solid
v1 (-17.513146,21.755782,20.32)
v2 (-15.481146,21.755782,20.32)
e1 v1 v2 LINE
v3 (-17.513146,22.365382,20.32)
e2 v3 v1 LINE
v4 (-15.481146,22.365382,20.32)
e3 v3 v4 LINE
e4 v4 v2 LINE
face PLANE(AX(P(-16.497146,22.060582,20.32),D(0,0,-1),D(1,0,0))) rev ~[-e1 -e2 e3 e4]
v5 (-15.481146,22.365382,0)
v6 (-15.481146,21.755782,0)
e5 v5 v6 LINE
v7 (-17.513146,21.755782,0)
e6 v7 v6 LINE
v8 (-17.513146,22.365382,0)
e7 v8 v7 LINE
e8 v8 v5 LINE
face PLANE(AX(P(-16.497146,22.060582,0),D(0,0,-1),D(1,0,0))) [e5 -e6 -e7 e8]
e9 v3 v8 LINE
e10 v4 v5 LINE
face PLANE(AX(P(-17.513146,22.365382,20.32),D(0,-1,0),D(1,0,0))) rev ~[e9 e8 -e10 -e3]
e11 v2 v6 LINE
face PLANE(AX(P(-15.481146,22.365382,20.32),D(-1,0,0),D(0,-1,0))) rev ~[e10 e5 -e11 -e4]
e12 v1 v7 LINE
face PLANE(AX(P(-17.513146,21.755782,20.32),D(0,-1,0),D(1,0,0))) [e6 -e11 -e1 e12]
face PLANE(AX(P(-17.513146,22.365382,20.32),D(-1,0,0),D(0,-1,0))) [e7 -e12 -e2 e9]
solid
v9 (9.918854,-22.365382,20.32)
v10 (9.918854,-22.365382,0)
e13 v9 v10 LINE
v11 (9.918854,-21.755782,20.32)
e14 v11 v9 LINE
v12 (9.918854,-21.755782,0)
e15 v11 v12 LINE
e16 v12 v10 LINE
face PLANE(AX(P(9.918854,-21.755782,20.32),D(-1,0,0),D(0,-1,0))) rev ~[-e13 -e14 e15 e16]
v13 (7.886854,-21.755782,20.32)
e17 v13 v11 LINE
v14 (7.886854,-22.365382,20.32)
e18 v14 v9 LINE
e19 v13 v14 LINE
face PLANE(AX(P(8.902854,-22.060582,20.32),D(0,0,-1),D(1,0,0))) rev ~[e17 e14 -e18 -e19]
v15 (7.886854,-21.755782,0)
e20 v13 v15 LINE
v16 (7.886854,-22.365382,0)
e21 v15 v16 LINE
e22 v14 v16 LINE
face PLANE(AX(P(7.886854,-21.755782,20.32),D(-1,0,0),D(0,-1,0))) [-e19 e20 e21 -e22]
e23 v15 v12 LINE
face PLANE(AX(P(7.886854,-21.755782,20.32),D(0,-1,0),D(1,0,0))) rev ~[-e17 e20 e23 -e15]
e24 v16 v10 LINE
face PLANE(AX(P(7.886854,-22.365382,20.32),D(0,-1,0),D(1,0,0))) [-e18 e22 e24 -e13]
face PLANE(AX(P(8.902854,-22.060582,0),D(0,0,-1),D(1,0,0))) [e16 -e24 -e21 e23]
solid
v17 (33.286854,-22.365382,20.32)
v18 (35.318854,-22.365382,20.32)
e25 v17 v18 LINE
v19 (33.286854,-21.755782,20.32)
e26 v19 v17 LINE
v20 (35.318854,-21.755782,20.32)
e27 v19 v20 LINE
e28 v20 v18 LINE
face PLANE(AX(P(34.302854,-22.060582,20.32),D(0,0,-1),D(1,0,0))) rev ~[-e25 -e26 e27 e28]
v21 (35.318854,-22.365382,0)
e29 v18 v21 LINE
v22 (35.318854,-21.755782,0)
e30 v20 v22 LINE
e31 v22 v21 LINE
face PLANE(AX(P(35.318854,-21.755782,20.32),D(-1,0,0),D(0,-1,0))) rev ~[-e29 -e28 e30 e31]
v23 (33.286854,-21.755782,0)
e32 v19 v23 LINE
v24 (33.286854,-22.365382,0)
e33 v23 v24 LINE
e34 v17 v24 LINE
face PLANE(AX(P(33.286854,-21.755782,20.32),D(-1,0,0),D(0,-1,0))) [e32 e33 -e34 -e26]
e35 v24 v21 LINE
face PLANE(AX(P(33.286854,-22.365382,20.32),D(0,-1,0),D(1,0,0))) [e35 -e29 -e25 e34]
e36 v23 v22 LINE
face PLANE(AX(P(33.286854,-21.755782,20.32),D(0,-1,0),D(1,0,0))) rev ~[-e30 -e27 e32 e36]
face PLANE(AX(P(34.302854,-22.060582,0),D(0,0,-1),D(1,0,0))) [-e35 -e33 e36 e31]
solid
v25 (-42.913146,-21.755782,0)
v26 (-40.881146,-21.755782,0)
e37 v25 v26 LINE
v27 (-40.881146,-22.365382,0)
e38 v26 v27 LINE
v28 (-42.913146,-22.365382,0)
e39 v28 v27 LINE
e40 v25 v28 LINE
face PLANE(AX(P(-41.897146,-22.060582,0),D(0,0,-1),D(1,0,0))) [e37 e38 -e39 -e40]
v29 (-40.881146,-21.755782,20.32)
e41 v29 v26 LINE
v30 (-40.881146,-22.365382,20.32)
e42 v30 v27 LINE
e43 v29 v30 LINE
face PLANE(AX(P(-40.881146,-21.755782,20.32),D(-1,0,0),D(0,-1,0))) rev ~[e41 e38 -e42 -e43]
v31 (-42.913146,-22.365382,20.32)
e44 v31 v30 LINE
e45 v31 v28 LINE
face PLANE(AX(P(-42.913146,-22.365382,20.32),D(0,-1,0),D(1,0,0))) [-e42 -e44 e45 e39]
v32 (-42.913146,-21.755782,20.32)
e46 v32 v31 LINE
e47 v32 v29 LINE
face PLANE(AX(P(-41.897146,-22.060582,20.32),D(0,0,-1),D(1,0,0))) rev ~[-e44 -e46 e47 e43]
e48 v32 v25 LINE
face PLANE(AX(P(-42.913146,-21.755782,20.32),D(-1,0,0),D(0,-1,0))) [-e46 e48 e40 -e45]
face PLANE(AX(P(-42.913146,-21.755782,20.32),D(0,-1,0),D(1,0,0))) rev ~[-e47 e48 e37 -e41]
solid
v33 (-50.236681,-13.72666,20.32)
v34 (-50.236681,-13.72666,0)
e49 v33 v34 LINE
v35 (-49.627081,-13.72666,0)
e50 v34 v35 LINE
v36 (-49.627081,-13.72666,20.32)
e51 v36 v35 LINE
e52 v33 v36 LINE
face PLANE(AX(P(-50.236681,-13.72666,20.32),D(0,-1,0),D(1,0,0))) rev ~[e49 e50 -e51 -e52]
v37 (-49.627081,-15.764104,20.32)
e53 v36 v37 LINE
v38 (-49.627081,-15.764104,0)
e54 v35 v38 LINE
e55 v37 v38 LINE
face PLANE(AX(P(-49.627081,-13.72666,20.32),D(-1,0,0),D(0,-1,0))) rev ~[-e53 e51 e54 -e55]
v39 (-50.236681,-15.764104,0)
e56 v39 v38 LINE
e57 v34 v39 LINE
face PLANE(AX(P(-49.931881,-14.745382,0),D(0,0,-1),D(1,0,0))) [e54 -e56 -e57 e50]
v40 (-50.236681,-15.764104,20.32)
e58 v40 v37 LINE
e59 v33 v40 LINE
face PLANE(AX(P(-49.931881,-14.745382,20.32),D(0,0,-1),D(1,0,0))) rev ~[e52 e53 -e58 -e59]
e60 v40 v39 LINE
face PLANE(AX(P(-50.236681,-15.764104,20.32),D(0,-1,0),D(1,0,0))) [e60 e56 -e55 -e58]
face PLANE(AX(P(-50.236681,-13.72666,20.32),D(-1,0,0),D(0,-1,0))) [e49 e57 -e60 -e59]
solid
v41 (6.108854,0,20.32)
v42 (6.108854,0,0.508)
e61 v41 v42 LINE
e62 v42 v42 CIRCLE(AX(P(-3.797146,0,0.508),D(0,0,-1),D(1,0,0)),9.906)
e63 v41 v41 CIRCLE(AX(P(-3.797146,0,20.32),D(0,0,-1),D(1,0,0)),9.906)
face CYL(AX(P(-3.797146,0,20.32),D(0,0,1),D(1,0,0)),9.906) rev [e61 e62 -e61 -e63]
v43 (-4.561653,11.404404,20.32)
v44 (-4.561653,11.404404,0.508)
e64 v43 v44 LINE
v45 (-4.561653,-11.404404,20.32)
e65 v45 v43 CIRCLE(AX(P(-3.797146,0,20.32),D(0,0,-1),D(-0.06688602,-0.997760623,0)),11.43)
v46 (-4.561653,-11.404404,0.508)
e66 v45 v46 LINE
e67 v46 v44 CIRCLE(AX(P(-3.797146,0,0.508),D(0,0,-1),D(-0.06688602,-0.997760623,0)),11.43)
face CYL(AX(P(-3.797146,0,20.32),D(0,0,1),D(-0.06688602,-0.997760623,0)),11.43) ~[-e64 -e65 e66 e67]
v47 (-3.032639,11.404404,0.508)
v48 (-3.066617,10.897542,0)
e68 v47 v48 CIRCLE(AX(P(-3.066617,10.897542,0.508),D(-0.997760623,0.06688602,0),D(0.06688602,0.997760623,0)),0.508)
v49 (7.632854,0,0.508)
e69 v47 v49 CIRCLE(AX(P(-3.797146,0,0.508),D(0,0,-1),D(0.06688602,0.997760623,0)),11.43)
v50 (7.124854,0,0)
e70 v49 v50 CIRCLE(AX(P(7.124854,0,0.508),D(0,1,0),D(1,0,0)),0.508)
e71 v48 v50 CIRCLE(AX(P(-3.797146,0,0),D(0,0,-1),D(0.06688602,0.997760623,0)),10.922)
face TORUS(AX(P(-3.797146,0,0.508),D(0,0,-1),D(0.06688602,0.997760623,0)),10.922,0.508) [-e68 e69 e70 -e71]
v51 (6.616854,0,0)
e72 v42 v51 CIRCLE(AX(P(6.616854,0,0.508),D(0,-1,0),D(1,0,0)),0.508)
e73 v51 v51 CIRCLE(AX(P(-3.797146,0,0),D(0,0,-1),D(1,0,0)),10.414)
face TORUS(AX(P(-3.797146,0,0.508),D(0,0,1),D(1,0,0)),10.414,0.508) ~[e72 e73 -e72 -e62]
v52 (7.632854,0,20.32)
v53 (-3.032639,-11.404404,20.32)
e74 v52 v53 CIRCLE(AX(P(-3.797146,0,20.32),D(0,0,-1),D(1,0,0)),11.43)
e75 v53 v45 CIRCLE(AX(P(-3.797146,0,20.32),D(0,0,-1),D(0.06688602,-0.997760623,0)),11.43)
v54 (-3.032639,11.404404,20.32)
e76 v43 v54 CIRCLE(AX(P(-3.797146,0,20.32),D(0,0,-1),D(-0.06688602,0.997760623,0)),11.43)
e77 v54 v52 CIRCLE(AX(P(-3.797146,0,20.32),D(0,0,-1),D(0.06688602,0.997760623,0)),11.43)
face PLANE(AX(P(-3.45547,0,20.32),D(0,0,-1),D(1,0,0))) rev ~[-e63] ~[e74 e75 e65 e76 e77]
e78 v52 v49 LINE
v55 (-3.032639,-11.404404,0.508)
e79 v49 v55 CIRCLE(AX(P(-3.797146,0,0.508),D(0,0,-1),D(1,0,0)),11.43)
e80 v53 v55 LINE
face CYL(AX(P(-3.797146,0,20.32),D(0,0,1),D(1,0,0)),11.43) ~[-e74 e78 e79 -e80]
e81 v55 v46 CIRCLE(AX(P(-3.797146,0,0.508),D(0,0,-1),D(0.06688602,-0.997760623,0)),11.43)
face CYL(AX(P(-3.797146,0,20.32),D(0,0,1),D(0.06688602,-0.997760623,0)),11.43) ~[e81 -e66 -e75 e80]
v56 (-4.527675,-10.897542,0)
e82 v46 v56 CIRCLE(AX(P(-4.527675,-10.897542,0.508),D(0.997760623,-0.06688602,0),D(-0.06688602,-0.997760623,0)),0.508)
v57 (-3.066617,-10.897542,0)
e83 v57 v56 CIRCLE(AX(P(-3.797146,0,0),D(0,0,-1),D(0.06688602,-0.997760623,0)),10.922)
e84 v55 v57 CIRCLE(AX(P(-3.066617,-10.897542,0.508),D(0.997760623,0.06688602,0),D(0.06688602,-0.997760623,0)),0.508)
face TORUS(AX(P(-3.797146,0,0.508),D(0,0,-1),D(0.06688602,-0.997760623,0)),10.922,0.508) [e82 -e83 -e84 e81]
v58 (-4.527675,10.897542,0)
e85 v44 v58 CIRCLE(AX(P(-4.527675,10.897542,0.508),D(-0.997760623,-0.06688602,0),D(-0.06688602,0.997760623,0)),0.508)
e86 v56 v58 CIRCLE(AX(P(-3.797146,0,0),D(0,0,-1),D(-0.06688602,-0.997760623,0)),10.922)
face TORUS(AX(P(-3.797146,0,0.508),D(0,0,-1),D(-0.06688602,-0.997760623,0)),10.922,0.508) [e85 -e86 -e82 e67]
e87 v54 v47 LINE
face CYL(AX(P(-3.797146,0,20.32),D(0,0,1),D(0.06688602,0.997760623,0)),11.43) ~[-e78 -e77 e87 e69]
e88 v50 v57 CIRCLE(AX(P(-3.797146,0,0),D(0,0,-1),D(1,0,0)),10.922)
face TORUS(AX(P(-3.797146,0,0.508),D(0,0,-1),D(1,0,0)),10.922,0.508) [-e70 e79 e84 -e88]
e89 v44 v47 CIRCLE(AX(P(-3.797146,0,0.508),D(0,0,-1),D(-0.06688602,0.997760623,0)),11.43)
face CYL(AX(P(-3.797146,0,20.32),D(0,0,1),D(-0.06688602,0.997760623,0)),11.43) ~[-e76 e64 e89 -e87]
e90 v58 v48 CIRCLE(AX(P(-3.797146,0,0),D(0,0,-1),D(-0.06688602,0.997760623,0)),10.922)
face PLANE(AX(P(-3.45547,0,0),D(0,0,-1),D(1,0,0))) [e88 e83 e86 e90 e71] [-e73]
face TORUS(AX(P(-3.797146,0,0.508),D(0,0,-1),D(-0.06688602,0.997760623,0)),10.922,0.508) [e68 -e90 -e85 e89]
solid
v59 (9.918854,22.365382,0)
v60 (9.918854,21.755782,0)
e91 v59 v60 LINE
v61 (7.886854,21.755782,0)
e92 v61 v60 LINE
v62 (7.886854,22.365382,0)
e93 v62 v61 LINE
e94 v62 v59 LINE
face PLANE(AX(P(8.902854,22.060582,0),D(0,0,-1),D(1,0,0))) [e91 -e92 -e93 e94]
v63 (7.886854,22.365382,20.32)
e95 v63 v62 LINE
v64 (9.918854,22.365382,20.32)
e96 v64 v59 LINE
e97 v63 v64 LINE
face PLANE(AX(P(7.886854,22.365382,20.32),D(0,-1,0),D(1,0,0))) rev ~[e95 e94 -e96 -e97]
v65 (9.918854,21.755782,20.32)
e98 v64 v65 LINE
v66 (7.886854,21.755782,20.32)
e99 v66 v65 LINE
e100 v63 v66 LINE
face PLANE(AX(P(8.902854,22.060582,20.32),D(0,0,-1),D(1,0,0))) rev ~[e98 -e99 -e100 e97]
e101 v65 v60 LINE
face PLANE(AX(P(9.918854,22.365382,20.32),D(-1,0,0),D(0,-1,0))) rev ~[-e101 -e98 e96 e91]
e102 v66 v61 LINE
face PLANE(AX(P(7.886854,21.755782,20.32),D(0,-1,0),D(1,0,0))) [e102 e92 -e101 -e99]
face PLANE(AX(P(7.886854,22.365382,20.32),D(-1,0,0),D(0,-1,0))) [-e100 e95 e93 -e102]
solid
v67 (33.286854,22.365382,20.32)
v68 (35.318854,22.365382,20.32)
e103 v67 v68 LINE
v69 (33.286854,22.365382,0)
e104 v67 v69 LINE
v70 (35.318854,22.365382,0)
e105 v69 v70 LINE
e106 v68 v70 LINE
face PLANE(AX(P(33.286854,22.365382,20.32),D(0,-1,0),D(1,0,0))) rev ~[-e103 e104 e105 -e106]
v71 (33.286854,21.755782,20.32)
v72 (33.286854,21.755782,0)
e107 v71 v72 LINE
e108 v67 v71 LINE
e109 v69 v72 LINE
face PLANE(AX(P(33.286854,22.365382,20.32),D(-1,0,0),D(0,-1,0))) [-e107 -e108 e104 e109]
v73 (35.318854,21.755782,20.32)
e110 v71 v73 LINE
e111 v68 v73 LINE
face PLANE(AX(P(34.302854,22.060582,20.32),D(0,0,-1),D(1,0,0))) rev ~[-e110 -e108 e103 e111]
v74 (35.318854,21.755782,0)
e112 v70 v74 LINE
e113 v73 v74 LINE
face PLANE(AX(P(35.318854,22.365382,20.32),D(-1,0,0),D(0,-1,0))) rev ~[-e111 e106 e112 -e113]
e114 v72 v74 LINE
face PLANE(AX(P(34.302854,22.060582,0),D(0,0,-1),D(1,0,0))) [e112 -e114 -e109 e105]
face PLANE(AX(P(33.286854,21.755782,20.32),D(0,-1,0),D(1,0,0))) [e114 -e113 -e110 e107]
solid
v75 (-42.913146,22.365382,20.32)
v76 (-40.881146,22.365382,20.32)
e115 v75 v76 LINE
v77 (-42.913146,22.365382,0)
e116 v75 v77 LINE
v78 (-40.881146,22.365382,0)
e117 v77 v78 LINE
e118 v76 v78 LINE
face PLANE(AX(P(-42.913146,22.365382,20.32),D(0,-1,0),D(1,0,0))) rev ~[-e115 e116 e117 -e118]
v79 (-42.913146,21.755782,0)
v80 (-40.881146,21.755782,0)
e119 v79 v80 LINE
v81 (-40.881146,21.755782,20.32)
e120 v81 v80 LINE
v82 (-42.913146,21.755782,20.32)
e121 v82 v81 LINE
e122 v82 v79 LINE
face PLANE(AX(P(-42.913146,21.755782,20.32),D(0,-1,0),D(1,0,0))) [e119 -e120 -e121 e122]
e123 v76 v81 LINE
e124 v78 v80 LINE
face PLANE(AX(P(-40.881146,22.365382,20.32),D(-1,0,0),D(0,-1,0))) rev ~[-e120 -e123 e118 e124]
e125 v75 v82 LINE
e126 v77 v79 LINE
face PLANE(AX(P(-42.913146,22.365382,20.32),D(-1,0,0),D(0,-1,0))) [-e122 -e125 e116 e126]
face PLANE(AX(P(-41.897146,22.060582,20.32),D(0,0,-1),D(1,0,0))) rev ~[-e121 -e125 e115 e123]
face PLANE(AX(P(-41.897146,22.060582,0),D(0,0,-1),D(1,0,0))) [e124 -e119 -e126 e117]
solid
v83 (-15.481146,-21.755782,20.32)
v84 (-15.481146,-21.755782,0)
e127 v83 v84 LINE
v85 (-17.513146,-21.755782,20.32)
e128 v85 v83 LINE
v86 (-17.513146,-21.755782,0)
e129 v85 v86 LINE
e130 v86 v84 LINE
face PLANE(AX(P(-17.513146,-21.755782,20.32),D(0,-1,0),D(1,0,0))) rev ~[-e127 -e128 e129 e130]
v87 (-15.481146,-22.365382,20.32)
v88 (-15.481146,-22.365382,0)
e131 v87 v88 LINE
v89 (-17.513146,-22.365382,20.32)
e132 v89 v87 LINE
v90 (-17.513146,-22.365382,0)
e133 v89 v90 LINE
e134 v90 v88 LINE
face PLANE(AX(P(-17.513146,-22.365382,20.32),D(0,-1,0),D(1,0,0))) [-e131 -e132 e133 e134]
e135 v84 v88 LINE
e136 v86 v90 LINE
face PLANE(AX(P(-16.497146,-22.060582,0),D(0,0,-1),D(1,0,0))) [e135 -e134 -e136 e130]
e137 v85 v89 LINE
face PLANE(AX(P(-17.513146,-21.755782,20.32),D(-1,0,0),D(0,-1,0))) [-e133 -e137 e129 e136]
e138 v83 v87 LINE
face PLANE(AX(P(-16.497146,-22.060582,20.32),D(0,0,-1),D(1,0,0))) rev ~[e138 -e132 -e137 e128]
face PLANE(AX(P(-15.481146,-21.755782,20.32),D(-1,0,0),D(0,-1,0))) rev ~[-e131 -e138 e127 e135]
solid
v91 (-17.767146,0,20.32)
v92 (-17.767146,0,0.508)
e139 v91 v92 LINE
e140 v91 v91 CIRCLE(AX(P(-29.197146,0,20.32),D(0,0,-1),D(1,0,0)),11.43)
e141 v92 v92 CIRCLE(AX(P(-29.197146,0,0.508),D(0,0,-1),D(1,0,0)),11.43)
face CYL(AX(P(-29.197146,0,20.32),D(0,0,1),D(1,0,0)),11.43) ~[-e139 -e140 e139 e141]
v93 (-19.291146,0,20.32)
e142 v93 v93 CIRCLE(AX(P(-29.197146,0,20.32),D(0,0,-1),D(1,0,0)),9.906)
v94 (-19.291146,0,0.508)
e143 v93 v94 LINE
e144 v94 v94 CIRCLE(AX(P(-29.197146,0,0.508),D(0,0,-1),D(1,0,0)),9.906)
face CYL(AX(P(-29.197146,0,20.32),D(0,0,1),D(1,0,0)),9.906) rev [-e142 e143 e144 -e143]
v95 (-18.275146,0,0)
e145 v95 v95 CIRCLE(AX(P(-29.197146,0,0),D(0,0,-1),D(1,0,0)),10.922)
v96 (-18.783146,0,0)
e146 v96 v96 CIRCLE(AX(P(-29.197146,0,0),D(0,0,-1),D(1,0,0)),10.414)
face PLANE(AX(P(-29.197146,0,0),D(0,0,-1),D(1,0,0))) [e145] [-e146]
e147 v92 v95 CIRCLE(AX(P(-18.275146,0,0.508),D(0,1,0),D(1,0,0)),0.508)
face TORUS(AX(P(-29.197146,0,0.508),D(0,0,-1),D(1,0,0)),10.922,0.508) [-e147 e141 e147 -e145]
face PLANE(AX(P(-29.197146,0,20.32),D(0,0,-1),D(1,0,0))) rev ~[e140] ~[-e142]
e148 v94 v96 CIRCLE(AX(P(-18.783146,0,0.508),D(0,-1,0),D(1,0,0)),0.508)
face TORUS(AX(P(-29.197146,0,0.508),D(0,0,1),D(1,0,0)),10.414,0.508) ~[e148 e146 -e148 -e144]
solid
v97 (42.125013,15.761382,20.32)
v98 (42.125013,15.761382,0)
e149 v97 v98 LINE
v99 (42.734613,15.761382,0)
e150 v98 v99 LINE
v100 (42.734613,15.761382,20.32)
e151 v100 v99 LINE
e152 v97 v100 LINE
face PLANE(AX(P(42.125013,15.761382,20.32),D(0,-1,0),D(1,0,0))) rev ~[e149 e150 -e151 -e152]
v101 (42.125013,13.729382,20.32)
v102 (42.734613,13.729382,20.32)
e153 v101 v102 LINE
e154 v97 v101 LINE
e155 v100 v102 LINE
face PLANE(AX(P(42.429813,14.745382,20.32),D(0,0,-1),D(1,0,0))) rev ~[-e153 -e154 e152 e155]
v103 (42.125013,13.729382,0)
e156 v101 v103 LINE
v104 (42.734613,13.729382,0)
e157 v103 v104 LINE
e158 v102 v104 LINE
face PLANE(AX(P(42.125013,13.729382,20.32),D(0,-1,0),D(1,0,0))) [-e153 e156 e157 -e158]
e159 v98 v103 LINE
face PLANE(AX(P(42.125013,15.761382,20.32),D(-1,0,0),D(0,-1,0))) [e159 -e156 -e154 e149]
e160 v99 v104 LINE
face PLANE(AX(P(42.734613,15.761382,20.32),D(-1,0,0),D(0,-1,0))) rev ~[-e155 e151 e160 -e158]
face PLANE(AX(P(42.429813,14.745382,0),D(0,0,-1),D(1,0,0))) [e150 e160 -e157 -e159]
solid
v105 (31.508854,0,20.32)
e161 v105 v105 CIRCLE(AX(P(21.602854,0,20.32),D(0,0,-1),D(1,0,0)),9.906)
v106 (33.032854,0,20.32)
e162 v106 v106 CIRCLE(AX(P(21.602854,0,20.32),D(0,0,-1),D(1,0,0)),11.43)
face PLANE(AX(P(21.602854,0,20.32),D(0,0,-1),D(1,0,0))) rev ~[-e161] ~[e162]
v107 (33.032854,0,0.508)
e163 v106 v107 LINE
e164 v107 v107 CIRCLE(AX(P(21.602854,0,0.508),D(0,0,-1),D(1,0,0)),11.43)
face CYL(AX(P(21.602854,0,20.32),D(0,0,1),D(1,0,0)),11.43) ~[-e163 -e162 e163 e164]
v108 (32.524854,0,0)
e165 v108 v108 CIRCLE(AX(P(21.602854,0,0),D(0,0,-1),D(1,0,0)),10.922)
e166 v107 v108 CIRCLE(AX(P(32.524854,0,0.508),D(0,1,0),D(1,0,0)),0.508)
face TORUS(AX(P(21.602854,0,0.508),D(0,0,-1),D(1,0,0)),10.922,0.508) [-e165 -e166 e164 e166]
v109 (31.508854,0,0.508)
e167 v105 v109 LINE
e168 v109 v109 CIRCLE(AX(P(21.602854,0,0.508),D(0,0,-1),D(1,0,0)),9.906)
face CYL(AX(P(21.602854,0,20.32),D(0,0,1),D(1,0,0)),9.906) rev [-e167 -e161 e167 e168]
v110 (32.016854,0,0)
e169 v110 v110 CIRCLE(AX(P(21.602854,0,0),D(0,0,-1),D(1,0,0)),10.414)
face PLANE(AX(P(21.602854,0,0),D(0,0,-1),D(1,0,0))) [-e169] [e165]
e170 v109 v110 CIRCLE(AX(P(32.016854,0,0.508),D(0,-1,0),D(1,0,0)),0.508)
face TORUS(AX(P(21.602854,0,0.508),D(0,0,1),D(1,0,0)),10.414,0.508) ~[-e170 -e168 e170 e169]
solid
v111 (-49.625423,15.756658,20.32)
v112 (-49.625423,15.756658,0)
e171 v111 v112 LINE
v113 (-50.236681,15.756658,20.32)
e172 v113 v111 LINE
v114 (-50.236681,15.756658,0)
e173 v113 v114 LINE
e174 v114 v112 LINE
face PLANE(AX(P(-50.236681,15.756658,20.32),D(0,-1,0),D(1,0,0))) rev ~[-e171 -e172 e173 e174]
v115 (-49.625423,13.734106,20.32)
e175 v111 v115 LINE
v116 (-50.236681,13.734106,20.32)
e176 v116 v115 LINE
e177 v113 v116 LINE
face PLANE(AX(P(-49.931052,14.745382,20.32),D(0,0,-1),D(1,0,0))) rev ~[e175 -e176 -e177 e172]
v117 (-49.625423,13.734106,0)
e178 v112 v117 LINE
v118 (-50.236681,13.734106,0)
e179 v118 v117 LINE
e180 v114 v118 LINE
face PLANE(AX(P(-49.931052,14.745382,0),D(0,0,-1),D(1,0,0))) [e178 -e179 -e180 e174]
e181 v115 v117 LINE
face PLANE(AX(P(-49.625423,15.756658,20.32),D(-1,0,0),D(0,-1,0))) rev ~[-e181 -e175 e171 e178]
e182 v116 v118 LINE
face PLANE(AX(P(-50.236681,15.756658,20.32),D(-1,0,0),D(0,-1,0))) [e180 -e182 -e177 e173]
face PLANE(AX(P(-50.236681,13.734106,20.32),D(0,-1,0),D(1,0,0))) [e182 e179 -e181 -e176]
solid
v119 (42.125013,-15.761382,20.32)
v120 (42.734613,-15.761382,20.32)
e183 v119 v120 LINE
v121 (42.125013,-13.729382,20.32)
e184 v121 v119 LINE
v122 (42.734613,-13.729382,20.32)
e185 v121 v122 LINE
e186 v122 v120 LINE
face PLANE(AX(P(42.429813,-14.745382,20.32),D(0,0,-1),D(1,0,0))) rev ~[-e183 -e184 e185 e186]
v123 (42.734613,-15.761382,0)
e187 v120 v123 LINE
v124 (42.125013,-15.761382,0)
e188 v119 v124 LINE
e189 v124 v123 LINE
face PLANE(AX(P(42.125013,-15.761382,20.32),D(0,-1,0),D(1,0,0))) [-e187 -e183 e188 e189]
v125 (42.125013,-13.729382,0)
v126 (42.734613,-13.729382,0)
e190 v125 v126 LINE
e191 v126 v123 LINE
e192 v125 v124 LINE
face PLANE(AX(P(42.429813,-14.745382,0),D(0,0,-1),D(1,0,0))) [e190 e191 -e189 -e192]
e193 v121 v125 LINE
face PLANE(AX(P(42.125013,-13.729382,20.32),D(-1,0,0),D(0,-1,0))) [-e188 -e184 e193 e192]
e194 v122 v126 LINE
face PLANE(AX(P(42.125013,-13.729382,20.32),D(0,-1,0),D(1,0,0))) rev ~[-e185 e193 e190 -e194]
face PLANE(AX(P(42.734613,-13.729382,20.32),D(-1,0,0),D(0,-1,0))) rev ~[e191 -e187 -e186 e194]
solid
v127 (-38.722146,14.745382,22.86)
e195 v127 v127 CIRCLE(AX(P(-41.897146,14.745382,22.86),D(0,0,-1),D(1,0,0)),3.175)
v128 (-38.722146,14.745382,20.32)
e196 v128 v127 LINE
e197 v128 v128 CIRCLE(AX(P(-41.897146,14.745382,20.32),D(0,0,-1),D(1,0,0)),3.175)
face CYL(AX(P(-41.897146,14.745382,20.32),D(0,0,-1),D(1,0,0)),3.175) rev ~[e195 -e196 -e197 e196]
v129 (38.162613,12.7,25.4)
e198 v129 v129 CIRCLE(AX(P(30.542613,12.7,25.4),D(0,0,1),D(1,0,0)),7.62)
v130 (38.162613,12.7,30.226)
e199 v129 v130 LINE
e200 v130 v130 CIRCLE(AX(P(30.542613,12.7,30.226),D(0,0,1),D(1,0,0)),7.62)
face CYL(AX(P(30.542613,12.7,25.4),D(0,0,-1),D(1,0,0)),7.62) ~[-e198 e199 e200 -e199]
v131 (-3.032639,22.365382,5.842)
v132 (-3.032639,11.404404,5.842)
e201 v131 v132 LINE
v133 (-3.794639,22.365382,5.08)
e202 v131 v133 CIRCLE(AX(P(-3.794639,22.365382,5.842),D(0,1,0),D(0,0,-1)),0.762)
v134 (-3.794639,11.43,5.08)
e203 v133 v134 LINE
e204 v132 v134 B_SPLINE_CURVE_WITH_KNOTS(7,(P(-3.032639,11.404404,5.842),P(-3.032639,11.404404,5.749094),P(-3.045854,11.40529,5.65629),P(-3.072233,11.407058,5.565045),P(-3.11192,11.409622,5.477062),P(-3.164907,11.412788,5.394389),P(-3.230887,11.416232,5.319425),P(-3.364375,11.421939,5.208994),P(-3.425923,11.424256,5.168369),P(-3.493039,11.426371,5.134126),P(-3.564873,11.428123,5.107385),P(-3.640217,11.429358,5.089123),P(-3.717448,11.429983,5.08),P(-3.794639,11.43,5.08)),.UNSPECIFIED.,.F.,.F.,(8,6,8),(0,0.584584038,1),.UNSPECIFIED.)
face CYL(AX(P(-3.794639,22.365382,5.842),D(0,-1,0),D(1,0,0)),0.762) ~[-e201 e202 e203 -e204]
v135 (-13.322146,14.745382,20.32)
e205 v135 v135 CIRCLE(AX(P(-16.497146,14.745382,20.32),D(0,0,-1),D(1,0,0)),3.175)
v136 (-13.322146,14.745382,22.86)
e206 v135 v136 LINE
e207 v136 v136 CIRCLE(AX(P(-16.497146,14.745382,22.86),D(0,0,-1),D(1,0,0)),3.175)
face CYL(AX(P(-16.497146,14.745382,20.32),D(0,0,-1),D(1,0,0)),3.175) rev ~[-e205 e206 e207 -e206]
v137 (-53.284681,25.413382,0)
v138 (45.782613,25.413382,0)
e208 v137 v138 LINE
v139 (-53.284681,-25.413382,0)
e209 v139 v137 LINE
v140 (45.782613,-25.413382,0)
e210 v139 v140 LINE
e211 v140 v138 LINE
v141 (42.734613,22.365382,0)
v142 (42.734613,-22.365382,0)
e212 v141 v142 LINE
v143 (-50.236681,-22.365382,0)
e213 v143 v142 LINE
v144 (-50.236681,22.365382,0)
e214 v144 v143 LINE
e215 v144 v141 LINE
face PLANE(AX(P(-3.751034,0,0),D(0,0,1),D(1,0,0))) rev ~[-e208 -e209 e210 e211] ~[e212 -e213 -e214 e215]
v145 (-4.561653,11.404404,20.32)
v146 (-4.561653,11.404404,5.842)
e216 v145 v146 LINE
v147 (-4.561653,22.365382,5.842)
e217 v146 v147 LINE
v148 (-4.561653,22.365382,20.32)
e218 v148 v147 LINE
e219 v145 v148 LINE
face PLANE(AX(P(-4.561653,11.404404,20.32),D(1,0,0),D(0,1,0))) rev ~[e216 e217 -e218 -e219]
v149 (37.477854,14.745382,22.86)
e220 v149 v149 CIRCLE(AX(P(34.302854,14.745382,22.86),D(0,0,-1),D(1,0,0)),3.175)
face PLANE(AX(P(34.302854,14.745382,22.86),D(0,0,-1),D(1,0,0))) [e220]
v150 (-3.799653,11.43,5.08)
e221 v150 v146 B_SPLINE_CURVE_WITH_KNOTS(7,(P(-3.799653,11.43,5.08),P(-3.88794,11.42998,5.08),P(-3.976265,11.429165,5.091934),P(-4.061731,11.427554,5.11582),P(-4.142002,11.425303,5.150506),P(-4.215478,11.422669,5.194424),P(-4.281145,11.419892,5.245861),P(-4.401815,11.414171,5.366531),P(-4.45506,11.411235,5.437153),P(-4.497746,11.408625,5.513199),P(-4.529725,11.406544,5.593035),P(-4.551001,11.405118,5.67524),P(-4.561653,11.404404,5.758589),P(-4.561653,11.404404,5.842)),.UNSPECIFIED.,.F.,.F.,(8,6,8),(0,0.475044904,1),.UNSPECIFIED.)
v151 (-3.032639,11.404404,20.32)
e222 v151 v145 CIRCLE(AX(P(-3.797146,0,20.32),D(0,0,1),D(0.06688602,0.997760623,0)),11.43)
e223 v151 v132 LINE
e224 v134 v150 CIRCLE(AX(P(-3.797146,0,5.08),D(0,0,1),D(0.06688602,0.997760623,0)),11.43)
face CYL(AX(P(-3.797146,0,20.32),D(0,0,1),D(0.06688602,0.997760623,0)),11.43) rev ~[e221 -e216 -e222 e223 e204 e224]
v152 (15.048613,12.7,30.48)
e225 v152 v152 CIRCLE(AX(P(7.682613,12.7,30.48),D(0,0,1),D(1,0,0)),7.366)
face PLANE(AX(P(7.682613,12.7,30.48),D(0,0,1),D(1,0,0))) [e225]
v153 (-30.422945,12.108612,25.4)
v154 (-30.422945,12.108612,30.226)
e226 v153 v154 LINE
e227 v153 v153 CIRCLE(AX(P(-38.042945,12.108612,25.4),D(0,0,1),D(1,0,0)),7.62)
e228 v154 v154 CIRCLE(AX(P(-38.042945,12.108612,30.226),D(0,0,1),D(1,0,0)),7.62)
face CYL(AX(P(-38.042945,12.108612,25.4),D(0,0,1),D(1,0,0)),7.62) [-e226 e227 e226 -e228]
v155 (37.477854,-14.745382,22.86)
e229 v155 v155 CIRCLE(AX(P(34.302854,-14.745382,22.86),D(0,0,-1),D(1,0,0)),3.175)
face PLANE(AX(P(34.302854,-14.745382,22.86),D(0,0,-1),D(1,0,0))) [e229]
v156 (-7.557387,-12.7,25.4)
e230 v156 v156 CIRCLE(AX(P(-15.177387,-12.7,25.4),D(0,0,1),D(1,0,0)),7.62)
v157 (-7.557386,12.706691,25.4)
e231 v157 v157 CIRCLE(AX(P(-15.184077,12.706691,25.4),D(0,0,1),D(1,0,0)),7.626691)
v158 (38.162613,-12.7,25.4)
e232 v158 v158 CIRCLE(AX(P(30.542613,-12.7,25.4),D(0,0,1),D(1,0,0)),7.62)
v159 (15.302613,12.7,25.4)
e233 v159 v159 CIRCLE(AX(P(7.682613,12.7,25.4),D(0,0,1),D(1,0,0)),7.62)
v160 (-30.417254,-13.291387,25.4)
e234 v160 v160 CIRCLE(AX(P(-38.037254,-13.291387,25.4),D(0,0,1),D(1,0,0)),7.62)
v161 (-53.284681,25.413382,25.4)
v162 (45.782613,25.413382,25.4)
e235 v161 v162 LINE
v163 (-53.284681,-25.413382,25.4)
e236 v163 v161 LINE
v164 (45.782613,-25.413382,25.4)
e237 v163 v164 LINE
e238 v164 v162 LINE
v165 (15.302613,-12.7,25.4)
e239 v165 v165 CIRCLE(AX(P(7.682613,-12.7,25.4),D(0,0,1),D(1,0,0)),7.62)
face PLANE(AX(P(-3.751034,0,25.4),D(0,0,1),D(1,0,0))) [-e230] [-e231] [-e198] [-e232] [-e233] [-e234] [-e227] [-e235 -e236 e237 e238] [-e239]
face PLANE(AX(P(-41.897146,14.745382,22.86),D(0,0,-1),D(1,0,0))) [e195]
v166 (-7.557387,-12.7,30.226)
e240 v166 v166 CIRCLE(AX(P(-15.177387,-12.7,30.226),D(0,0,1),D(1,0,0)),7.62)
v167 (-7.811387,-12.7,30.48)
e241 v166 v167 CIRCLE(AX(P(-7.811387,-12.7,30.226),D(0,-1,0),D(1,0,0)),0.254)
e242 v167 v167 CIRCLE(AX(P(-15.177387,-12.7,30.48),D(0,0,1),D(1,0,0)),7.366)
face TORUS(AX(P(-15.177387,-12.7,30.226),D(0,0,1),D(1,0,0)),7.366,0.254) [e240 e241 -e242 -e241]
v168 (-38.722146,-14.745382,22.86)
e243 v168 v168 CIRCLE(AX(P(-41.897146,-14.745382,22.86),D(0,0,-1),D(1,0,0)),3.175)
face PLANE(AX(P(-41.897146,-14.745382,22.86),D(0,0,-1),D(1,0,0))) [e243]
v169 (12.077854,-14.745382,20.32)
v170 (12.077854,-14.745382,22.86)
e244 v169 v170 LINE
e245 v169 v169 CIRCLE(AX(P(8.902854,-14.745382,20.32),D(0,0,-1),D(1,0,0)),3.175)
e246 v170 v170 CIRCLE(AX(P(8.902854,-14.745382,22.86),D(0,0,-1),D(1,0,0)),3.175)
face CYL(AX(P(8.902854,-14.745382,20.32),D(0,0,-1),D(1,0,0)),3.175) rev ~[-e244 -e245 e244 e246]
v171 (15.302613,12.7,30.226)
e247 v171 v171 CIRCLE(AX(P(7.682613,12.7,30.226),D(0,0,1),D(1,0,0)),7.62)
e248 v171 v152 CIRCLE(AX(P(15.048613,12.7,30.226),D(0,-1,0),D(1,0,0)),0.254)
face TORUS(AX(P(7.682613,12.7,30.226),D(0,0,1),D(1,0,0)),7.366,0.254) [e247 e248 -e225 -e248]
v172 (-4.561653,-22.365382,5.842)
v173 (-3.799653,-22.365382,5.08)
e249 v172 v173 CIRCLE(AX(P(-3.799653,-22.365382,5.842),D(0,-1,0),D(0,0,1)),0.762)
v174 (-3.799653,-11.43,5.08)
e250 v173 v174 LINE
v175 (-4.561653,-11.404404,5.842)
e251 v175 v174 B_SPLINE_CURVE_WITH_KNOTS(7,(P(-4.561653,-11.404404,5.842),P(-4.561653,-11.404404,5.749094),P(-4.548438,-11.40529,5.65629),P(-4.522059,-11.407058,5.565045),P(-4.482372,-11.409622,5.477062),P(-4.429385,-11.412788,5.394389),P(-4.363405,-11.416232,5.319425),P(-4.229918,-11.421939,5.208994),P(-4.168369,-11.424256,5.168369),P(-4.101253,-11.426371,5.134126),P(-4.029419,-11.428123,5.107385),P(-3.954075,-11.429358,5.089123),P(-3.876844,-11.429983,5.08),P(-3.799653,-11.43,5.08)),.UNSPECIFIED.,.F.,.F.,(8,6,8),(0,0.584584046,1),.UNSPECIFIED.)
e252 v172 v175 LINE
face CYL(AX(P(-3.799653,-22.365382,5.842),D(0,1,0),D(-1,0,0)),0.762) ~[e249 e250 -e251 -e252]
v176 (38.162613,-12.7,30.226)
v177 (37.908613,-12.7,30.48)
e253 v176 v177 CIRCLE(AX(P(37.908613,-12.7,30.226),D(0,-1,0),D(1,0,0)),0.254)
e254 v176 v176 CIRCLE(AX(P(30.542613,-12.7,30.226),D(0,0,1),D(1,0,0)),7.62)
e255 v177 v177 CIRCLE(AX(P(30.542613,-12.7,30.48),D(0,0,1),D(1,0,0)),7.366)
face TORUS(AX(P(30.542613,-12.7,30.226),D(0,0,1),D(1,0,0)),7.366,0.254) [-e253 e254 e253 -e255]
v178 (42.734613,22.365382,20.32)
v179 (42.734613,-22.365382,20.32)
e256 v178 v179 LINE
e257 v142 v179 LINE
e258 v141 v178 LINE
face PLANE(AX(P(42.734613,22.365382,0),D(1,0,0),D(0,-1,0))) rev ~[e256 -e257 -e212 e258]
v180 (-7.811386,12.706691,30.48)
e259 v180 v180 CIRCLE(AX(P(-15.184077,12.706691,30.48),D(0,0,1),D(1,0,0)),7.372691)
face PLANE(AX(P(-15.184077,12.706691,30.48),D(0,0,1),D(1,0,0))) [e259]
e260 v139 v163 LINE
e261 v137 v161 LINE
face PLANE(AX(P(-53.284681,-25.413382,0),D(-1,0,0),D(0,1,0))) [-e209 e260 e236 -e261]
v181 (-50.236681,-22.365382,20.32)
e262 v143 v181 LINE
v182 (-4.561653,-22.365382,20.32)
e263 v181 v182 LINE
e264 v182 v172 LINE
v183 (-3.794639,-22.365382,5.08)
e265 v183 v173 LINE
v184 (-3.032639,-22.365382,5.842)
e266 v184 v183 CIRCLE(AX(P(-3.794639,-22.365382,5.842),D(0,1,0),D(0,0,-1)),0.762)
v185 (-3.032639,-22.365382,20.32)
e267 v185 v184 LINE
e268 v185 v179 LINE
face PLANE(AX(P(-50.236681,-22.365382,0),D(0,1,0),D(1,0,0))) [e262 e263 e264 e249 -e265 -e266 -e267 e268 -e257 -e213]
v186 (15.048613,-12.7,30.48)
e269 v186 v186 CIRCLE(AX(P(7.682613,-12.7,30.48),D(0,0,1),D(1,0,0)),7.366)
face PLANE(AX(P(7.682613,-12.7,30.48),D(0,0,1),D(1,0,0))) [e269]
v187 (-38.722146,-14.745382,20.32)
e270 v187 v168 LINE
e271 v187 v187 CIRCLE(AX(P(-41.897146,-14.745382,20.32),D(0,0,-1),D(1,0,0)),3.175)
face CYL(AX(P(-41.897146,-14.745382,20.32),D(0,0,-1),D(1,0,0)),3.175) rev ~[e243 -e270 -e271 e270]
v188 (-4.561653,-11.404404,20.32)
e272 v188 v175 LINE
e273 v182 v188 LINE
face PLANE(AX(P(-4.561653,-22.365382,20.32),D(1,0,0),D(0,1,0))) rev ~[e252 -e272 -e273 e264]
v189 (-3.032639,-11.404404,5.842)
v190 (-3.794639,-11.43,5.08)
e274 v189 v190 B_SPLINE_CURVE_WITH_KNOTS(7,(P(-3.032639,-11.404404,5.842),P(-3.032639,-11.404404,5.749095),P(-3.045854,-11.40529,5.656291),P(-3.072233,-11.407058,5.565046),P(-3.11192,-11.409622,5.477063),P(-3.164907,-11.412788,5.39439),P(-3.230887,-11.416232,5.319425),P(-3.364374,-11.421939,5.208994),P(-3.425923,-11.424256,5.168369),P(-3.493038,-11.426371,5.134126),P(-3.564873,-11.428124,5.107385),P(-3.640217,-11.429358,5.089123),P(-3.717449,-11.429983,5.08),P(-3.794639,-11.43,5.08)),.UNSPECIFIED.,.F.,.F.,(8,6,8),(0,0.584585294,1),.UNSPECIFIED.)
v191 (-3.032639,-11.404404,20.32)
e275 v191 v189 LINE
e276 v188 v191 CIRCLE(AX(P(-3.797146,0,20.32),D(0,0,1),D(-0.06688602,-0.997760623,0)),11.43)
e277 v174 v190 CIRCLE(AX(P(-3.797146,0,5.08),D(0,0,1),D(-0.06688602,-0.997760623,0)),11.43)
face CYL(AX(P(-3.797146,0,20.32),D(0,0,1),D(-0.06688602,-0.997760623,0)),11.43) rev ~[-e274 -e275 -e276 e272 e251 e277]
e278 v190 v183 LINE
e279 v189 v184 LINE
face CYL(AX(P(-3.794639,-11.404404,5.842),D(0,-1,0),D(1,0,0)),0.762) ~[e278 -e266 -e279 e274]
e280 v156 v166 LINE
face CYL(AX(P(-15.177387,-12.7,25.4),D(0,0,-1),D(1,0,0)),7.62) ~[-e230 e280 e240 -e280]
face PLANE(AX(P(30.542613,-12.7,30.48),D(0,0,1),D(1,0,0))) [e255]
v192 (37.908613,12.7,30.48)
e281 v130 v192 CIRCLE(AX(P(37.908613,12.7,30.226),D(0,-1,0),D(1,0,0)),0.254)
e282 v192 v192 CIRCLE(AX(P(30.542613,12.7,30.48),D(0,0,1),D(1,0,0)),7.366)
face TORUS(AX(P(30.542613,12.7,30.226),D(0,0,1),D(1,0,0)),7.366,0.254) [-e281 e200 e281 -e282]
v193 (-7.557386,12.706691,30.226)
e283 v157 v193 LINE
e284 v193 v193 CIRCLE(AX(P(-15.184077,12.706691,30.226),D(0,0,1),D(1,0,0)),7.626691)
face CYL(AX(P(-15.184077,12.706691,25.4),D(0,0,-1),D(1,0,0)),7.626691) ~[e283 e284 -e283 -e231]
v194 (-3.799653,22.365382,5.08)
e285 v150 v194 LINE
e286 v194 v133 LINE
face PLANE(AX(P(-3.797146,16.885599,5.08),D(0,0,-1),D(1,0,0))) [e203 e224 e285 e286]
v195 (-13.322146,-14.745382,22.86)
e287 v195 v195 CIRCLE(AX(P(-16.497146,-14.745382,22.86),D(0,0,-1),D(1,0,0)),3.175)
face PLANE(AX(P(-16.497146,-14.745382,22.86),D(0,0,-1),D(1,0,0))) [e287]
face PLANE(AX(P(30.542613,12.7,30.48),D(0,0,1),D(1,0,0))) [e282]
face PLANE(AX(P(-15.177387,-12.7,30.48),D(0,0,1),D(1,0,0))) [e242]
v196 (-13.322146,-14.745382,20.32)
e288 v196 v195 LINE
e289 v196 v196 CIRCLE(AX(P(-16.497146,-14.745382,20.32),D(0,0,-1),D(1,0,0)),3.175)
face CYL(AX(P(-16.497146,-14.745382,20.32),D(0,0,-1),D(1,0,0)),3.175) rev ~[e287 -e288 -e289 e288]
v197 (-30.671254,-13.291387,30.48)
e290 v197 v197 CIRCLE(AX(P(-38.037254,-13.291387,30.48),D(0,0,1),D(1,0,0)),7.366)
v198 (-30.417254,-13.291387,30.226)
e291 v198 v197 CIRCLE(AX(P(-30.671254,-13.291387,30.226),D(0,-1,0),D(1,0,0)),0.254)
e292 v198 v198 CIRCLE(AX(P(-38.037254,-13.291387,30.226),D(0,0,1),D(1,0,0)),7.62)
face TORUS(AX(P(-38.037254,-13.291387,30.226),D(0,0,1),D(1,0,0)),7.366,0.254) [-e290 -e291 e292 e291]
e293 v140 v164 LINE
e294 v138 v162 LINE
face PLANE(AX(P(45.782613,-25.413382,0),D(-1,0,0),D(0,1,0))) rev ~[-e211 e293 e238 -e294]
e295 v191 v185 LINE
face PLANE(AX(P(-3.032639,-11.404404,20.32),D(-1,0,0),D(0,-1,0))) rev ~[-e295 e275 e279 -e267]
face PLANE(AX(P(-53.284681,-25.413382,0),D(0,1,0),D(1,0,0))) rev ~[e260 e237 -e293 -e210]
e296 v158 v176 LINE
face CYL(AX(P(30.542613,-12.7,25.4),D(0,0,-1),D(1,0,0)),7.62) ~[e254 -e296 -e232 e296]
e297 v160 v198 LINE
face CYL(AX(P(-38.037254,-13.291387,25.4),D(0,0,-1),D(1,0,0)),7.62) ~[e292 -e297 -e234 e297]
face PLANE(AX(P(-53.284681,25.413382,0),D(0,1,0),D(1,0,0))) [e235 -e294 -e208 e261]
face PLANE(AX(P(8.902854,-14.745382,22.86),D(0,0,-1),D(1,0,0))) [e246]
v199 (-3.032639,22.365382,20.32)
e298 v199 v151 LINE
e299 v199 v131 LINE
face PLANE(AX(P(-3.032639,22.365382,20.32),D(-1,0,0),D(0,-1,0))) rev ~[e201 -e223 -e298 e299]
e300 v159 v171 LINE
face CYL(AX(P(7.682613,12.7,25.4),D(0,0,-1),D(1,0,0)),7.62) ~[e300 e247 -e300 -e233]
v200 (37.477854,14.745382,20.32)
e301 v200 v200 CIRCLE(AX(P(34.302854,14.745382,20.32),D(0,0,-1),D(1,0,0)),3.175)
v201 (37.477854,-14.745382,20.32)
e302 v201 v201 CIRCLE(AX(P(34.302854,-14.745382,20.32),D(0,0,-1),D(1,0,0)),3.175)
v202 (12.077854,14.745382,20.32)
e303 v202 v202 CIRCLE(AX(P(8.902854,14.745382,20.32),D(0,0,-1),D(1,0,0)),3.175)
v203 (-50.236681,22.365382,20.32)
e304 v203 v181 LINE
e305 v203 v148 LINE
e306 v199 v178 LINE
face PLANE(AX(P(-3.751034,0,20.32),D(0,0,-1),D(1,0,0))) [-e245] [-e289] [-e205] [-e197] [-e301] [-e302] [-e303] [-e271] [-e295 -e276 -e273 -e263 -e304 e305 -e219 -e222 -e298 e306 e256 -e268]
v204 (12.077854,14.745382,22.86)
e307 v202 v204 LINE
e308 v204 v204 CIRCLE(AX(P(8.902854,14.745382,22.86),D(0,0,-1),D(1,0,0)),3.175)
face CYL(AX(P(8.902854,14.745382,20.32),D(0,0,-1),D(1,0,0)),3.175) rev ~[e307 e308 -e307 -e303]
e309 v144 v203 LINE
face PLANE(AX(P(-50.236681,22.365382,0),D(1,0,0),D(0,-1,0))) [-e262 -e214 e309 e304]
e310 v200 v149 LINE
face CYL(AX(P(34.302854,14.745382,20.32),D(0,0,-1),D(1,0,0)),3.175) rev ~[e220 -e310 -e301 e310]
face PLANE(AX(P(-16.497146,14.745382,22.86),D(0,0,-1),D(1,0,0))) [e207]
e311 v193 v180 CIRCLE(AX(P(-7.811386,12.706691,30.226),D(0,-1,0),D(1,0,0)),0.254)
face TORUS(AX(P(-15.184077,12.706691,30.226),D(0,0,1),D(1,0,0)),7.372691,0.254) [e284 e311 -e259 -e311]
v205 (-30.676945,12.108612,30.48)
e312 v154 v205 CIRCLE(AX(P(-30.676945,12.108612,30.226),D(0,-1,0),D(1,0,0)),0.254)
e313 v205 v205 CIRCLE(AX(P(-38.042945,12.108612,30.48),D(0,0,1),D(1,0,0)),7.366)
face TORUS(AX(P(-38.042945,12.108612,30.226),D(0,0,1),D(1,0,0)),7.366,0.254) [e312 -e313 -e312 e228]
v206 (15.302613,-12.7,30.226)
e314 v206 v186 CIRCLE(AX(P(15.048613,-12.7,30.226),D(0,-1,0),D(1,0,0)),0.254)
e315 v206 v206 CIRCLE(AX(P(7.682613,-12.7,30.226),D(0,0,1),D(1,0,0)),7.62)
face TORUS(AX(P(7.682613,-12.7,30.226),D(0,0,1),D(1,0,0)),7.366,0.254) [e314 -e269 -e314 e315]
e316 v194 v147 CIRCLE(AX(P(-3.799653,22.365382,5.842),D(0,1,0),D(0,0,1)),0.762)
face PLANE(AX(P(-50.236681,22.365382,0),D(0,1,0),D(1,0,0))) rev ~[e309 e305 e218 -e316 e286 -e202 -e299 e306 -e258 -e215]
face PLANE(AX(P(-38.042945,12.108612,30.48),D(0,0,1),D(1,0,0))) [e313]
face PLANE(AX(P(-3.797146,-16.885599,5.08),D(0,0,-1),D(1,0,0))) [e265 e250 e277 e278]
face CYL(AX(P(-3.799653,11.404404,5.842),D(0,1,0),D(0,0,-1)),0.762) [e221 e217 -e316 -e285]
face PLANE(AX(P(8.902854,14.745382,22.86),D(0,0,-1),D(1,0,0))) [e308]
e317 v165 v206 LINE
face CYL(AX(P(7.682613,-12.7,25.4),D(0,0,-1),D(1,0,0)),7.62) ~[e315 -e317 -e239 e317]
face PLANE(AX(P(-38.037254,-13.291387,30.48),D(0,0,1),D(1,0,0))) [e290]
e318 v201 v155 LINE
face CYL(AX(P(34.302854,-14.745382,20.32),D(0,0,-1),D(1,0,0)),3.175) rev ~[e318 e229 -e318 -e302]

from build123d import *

# Parameters (mm, degrees)
F0_W      = 99.0672948342
F0_H      = 50.8267641079
F1_DEPTH  = 25.4
F2_R      = 7.626691027
F2_R_2    = 7.62
F3_DEPTH  = 5.08
F4_W      = 92.9712948342
F4_H      = 44.7307641079
F5_DEPTH  = 20.32
F7_DEPTH  = 15.24
F8_R      = 0.762
F9_DEPTH  = 15.24
F10_R     = 0.762
F6_R      = 9.906
F11_DEPTH = 20.32
F6_R_2    = 11.43
F6_W      = 2.032
F6_H      = 0.6096
F6_W_2    = 0.6096
F6_H_2    = 2.032
F6_W_3    = 0.611258532
F6_H_3    = 2.022552159
F6_H_4    = 2.0374442969
F12_R     = 0.508
F12_2_R   = 0.508
F12_3_R   = 0.508
F6_R_3    = 3.175
F13_DEPTH = 2.54
F14_R     = 0.254


# Not quite as in the source:
# - a feature names something its author has since deleted; it is built from what else it names


with BuildPart() as f1:
    # F0 (on Top) → F1 (new body)
    with BuildSketch(Plane.XY):
        with Locations((-3.7510339205, 0)):
            Rectangle(F0_W, F0_H)
    extrude(amount=F1_DEPTH)

    # F2 (on face) → F3 (join, symmetric)
    with BuildSketch(Plane.XY.offset(25.4)):
        with Locations((-15.1840765514, 12.706691027)):
            Circle(F2_R)
        with Locations((7.6826134967, 12.7)):
            Circle(F2_R_2)
        with Locations((30.5426134967, 12.7)):
            Circle(F2_R_2)
        with Locations((30.5426134967, -12.7)):
            Circle(F2_R_2)
        with Locations((7.6826134967, -12.7)):
            Circle(F2_R_2)
        with Locations((-15.1773865033, -12.7)):
            Circle(F2_R_2)
        with Locations((-38.0372540034, -13.2913871026)):
            Circle(F2_R_2)
        with Locations((-38.0429448591, 12.1086122599)):
            Circle(F2_R_2)
    extrude(amount=F3_DEPTH, both=True)

    # F4 (on face) → F5 (cut)
    with BuildSketch(Plane(origin=(0, 0, 0), x_dir=(1, 0, 0), z_dir=(0, 0, -1))):
        with Locations((-3.7510339205, 0)):
            Rectangle(F4_W, F4_H)
    extrude(amount=-F5_DEPTH, mode=Mode.SUBTRACT)

    # F6 (on face) → F7 (join)
    with BuildSketch(Plane(origin=(0, 0, 20.32), x_dir=(1, 0, 0), z_dir=(0, 0, -1))):
        with BuildLine():
            Line((-4.5616532358, -11.4044039181), (-4.5616532358, -22.3653820539))
            Line((-4.5616532358, -22.3653820539), (-3.0326388163, -22.3653820539))
            Line((-3.0326388163, -22.3653820539), (-3.0326388163, -11.4044039181))
            ThreePointArc((-3.0326388163, -11.4044039181), (-3.797146026, -11.43), (-4.5616532358, -11.4044039181))
        make_face()
    extrude(amount=F7_DEPTH)

    # F8
    f8_edges = [f1.edges().sort_by_distance(p)[0] for p in [
        (-3.032639, 16.884893, 5.08),
        (-4.561653, 16.884893, 5.08),
    ]]
    fillet(f8_edges, radius=F8_R)

    # F6 (on face) → F9 (join)
    with BuildSketch(Plane(origin=(0, 0, 20.32), x_dir=(1, 0, 0), z_dir=(0, 0, -1))):
        with BuildLine():
            Line((-4.5616532358, 22.3653820539), (-4.5616532358, 11.4044039181))
            ThreePointArc((-4.5616532358, 11.4044039181), (-3.797146026, 11.43), (-3.0326388163, 11.4044039181))
            Line((-3.0326388163, 11.4044039181), (-3.0326388163, 22.3653820539))
            Line((-3.0326388163, 22.3653820539), (-4.5616532358, 22.3653820539))
        make_face()
    extrude(amount=F9_DEPTH)

    # F10
    f10_edges = [f1.edges().sort_by_distance(p)[0] for p in [
        (-3.032639, -16.884893, 5.08),
        (-4.561653, -16.884893, 5.08),
    ]]
    fillet(f10_edges, radius=F10_R)

    # F6 (on face) → F13 (cut)
    with BuildSketch(Plane(origin=(0, 0, 20.32), x_dir=(1, 0, 0), z_dir=(0, 0, -1))):
        with Locations((34.302853974, -14.7453820539)):
            Circle(F6_R_3)
        with Locations((8.902853974, -14.7453820539)):
            Circle(F6_R_3)
        with Locations((8.902853974, 14.7453820539)):
            Circle(F6_R_3)
        with Locations((34.302853974, 14.7453820539)):
            Circle(F6_R_3)
        with Locations((-16.497146026, 14.7453820539)):
            Circle(F6_R_3)
        with Locations((-16.497146026, -14.7453820539)):
            Circle(F6_R_3)
        with Locations((-41.897146026, 14.7453820539)):
            Circle(F6_R_3)
        with Locations((-41.897146026, -14.7453820539)):
            Circle(F6_R_3)
    extrude(amount=-F13_DEPTH, mode=Mode.SUBTRACT)

    # F14
    f14_edges = [f1.edges().sort_by_distance(p)[0] for p in [
        (-22.797387, -12.7, 30.48),
        (0.062613, -12.7, 30.48),
        (22.922613, -12.7, 30.48),
        (22.922613, 12.7, 30.48),
        (0.062613, 12.7, 30.48),
        (-22.810768, 12.706691, 30.48),
        (-45.662945, 12.108612, 30.48),
        (-45.657254, -13.291387, 30.48),
    ]]
    fillet(f14_edges, radius=F14_R)


with BuildPart() as f11:
    # F6 (on face) → F11 (new body)
    with BuildSketch(Plane(origin=(0, 0, 20.32), x_dir=(1, 0, 0), z_dir=(0, 0, -1))):
        with BuildLine():
            ThreePointArc((-4.5616532358, 11.4044039181), (-15.227146026, 0), (-4.5616532358, -11.4044039181))
            ThreePointArc((-4.5616532358, -11.4044039181), (-3.797146026, -11.43), (-3.0326388163, -11.4044039181))
            ThreePointArc((-3.0326388163, -11.4044039181), (4.5510039908, -7.8072588849), (7.632853974, 0))
            ThreePointArc((7.632853974, 0), (4.5510039908, 7.8072588849), (-3.0326388163, 11.4044039181))
            ThreePointArc((-3.0326388163, 11.4044039181), (-3.797146026, 11.43), (-4.5616532358, 11.4044039181))
        make_face()
        with Locations((-3.797146026, 0)):
            Circle(F6_R, mode=Mode.SUBTRACT)
    extrude(amount=F11_DEPTH)

    # F12
    f12_edges = [f11.edges().sort_by_distance(p)[0] for p in [
        (-3.032639, -11.404404, 0),
        (-13.703146, 0, 0),
    ]]
    fillet(f12_edges, radius=F12_R)


with BuildPart() as f11b:
    # F6 (on face) → F11, piece 2 (new body)
    with BuildSketch(Plane(origin=(0, 0, 20.32), x_dir=(1, 0, 0), z_dir=(0, 0, -1))):
        with Locations((-29.197146026, 0)):
            Circle(F6_R_2)
        with Locations((-29.197146026, 0)):
            Circle(F6_R, mode=Mode.SUBTRACT)
    extrude(amount=F11_DEPTH)

    # F12#2
    f12_2_edges = [f11b.edges().sort_by_distance(p)[0] for p in [
        (-40.627146, 0, 0),
        (-39.103146, 0, 0),
    ]]
    fillet(f12_2_edges, radius=F12_2_R)


with BuildPart() as f11c:
    # F6 (on face) → F11, piece 3 (new body)
    with BuildSketch(Plane(origin=(0, 0, 20.32), x_dir=(1, 0, 0), z_dir=(0, 0, -1))):
        with Locations((21.602853974, 0)):
            Circle(F6_R_2)
        with Locations((21.602853974, 0)):
            Circle(F6_R, mode=Mode.SUBTRACT)
    extrude(amount=F11_DEPTH)

    # F12#3
    f12_3_edges = [f11c.edges().sort_by_distance(p)[0] for p in [
        (10.172854, 0, 0),
        (11.696854, 0, 0),
    ]]
    fillet(f12_3_edges, radius=F12_3_R)


with BuildPart() as f11d:
    # F6 (on face) → F11, piece 4 (new body)
    with BuildSketch(Plane(origin=(0, 0, 20.32), x_dir=(1, 0, 0), z_dir=(0, 0, -1))):
        with Locations((34.302853974, 22.0605820539)):
            Rectangle(F6_W, F6_H)
    extrude(amount=F11_DEPTH)


with BuildPart() as f11e:
    # F6 (on face) → F11, piece 5 (new body)
    with BuildSketch(Plane(origin=(0, 0, 20.32), x_dir=(1, 0, 0), z_dir=(0, 0, -1))):
        with Locations((42.4298134967, 14.7453820539)):
            Rectangle(F6_W_2, F6_H_2)
    extrude(amount=F11_DEPTH)


with BuildPart() as f11f:
    # F6 (on face) → F11, piece 6 (new body)
    with BuildSketch(Plane(origin=(0, 0, 20.32), x_dir=(1, 0, 0), z_dir=(0, 0, -1))):
        with Locations((42.4298134967, -14.7453820539)):
            Rectangle(F6_W_2, F6_H_2)
    extrude(amount=F11_DEPTH)


with BuildPart() as f11g:
    # F6 (on face) → F11, piece 7 (new body)
    with BuildSketch(Plane(origin=(0, 0, 20.32), x_dir=(1, 0, 0), z_dir=(0, 0, -1))):
        with Locations((34.302853974, -22.0605820539)):
            Rectangle(F6_W, F6_H)
    extrude(amount=F11_DEPTH)


with BuildPart() as f11h:
    # F6 (on face) → F11, piece 8 (new body)
    with BuildSketch(Plane(origin=(0, 0, 20.32), x_dir=(1, 0, 0), z_dir=(0, 0, -1))):
        with Locations((8.902853974, -22.0605820539)):
            Rectangle(F6_W, F6_H)
    extrude(amount=F11_DEPTH)


with BuildPart() as f11i:
    # F6 (on face) → F11, piece 9 (new body)
    with BuildSketch(Plane(origin=(0, 0, 20.32), x_dir=(1, 0, 0), z_dir=(0, 0, -1))):
        with Locations((-16.497146026, -22.0605820539)):
            Rectangle(F6_W, F6_H)
    extrude(amount=F11_DEPTH)


with BuildPart() as f11j:
    # F6 (on face) → F11, piece 10 (new body)
    with BuildSketch(Plane(origin=(0, 0, 20.32), x_dir=(1, 0, 0), z_dir=(0, 0, -1))):
        with Locations((-41.897146026, -22.0605820539)):
            Rectangle(F6_W, F6_H)
    extrude(amount=F11_DEPTH)


with BuildPart() as f11k:
    # F6 (on face) → F11, piece 11 (new body)
    with BuildSketch(Plane(origin=(0, 0, 20.32), x_dir=(1, 0, 0), z_dir=(0, 0, -1))):
        with Locations((-49.9310520716, -14.7453820539)):
            Rectangle(F6_W_3, F6_H_3)
    extrude(amount=F11_DEPTH)


with BuildPart() as f11l:
    # F6 (on face) → F11, piece 12 (new body)
    with BuildSketch(Plane(origin=(0, 0, 20.32), x_dir=(1, 0, 0), z_dir=(0, 0, -1))):
        with Locations((-49.9318813376, 14.7453820539)):
            Rectangle(F6_W_2, F6_H_4)
    extrude(amount=F11_DEPTH)


with BuildPart() as f11m:
    # F6 (on face) → F11, piece 13 (new body)
    with BuildSketch(Plane(origin=(0, 0, 20.32), x_dir=(1, 0, 0), z_dir=(0, 0, -1))):
        with Locations((-41.897146026, 22.0605820539)):
            Rectangle(F6_W, F6_H)
    extrude(amount=F11_DEPTH)


with BuildPart() as f11n:
    # F6 (on face) → F11, piece 14 (new body)
    with BuildSketch(Plane(origin=(0, 0, 20.32), x_dir=(1, 0, 0), z_dir=(0, 0, -1))):
        with Locations((-16.497146026, 22.0605820539)):
            Rectangle(F6_W, F6_H)
    extrude(amount=F11_DEPTH)


with BuildPart() as f11o:
    # F6 (on face) → F11, piece 15 (new body)
    with BuildSketch(Plane(origin=(0, 0, 20.32), x_dir=(1, 0, 0), z_dir=(0, 0, -1))):
        with Locations((8.902853974, 22.0605820539)):
            Rectangle(F6_W, F6_H)
    extrude(amount=F11_DEPTH)


solid = Compound([f1.part, f11.part, f11b.part, f11c.part, f11d.part, f11e.part, f11f.part, f11g.part, f11h.part, f11i.part, f11j.part, f11k.part, f11l.part, f11m.part, f11n.part, f11o.part])
